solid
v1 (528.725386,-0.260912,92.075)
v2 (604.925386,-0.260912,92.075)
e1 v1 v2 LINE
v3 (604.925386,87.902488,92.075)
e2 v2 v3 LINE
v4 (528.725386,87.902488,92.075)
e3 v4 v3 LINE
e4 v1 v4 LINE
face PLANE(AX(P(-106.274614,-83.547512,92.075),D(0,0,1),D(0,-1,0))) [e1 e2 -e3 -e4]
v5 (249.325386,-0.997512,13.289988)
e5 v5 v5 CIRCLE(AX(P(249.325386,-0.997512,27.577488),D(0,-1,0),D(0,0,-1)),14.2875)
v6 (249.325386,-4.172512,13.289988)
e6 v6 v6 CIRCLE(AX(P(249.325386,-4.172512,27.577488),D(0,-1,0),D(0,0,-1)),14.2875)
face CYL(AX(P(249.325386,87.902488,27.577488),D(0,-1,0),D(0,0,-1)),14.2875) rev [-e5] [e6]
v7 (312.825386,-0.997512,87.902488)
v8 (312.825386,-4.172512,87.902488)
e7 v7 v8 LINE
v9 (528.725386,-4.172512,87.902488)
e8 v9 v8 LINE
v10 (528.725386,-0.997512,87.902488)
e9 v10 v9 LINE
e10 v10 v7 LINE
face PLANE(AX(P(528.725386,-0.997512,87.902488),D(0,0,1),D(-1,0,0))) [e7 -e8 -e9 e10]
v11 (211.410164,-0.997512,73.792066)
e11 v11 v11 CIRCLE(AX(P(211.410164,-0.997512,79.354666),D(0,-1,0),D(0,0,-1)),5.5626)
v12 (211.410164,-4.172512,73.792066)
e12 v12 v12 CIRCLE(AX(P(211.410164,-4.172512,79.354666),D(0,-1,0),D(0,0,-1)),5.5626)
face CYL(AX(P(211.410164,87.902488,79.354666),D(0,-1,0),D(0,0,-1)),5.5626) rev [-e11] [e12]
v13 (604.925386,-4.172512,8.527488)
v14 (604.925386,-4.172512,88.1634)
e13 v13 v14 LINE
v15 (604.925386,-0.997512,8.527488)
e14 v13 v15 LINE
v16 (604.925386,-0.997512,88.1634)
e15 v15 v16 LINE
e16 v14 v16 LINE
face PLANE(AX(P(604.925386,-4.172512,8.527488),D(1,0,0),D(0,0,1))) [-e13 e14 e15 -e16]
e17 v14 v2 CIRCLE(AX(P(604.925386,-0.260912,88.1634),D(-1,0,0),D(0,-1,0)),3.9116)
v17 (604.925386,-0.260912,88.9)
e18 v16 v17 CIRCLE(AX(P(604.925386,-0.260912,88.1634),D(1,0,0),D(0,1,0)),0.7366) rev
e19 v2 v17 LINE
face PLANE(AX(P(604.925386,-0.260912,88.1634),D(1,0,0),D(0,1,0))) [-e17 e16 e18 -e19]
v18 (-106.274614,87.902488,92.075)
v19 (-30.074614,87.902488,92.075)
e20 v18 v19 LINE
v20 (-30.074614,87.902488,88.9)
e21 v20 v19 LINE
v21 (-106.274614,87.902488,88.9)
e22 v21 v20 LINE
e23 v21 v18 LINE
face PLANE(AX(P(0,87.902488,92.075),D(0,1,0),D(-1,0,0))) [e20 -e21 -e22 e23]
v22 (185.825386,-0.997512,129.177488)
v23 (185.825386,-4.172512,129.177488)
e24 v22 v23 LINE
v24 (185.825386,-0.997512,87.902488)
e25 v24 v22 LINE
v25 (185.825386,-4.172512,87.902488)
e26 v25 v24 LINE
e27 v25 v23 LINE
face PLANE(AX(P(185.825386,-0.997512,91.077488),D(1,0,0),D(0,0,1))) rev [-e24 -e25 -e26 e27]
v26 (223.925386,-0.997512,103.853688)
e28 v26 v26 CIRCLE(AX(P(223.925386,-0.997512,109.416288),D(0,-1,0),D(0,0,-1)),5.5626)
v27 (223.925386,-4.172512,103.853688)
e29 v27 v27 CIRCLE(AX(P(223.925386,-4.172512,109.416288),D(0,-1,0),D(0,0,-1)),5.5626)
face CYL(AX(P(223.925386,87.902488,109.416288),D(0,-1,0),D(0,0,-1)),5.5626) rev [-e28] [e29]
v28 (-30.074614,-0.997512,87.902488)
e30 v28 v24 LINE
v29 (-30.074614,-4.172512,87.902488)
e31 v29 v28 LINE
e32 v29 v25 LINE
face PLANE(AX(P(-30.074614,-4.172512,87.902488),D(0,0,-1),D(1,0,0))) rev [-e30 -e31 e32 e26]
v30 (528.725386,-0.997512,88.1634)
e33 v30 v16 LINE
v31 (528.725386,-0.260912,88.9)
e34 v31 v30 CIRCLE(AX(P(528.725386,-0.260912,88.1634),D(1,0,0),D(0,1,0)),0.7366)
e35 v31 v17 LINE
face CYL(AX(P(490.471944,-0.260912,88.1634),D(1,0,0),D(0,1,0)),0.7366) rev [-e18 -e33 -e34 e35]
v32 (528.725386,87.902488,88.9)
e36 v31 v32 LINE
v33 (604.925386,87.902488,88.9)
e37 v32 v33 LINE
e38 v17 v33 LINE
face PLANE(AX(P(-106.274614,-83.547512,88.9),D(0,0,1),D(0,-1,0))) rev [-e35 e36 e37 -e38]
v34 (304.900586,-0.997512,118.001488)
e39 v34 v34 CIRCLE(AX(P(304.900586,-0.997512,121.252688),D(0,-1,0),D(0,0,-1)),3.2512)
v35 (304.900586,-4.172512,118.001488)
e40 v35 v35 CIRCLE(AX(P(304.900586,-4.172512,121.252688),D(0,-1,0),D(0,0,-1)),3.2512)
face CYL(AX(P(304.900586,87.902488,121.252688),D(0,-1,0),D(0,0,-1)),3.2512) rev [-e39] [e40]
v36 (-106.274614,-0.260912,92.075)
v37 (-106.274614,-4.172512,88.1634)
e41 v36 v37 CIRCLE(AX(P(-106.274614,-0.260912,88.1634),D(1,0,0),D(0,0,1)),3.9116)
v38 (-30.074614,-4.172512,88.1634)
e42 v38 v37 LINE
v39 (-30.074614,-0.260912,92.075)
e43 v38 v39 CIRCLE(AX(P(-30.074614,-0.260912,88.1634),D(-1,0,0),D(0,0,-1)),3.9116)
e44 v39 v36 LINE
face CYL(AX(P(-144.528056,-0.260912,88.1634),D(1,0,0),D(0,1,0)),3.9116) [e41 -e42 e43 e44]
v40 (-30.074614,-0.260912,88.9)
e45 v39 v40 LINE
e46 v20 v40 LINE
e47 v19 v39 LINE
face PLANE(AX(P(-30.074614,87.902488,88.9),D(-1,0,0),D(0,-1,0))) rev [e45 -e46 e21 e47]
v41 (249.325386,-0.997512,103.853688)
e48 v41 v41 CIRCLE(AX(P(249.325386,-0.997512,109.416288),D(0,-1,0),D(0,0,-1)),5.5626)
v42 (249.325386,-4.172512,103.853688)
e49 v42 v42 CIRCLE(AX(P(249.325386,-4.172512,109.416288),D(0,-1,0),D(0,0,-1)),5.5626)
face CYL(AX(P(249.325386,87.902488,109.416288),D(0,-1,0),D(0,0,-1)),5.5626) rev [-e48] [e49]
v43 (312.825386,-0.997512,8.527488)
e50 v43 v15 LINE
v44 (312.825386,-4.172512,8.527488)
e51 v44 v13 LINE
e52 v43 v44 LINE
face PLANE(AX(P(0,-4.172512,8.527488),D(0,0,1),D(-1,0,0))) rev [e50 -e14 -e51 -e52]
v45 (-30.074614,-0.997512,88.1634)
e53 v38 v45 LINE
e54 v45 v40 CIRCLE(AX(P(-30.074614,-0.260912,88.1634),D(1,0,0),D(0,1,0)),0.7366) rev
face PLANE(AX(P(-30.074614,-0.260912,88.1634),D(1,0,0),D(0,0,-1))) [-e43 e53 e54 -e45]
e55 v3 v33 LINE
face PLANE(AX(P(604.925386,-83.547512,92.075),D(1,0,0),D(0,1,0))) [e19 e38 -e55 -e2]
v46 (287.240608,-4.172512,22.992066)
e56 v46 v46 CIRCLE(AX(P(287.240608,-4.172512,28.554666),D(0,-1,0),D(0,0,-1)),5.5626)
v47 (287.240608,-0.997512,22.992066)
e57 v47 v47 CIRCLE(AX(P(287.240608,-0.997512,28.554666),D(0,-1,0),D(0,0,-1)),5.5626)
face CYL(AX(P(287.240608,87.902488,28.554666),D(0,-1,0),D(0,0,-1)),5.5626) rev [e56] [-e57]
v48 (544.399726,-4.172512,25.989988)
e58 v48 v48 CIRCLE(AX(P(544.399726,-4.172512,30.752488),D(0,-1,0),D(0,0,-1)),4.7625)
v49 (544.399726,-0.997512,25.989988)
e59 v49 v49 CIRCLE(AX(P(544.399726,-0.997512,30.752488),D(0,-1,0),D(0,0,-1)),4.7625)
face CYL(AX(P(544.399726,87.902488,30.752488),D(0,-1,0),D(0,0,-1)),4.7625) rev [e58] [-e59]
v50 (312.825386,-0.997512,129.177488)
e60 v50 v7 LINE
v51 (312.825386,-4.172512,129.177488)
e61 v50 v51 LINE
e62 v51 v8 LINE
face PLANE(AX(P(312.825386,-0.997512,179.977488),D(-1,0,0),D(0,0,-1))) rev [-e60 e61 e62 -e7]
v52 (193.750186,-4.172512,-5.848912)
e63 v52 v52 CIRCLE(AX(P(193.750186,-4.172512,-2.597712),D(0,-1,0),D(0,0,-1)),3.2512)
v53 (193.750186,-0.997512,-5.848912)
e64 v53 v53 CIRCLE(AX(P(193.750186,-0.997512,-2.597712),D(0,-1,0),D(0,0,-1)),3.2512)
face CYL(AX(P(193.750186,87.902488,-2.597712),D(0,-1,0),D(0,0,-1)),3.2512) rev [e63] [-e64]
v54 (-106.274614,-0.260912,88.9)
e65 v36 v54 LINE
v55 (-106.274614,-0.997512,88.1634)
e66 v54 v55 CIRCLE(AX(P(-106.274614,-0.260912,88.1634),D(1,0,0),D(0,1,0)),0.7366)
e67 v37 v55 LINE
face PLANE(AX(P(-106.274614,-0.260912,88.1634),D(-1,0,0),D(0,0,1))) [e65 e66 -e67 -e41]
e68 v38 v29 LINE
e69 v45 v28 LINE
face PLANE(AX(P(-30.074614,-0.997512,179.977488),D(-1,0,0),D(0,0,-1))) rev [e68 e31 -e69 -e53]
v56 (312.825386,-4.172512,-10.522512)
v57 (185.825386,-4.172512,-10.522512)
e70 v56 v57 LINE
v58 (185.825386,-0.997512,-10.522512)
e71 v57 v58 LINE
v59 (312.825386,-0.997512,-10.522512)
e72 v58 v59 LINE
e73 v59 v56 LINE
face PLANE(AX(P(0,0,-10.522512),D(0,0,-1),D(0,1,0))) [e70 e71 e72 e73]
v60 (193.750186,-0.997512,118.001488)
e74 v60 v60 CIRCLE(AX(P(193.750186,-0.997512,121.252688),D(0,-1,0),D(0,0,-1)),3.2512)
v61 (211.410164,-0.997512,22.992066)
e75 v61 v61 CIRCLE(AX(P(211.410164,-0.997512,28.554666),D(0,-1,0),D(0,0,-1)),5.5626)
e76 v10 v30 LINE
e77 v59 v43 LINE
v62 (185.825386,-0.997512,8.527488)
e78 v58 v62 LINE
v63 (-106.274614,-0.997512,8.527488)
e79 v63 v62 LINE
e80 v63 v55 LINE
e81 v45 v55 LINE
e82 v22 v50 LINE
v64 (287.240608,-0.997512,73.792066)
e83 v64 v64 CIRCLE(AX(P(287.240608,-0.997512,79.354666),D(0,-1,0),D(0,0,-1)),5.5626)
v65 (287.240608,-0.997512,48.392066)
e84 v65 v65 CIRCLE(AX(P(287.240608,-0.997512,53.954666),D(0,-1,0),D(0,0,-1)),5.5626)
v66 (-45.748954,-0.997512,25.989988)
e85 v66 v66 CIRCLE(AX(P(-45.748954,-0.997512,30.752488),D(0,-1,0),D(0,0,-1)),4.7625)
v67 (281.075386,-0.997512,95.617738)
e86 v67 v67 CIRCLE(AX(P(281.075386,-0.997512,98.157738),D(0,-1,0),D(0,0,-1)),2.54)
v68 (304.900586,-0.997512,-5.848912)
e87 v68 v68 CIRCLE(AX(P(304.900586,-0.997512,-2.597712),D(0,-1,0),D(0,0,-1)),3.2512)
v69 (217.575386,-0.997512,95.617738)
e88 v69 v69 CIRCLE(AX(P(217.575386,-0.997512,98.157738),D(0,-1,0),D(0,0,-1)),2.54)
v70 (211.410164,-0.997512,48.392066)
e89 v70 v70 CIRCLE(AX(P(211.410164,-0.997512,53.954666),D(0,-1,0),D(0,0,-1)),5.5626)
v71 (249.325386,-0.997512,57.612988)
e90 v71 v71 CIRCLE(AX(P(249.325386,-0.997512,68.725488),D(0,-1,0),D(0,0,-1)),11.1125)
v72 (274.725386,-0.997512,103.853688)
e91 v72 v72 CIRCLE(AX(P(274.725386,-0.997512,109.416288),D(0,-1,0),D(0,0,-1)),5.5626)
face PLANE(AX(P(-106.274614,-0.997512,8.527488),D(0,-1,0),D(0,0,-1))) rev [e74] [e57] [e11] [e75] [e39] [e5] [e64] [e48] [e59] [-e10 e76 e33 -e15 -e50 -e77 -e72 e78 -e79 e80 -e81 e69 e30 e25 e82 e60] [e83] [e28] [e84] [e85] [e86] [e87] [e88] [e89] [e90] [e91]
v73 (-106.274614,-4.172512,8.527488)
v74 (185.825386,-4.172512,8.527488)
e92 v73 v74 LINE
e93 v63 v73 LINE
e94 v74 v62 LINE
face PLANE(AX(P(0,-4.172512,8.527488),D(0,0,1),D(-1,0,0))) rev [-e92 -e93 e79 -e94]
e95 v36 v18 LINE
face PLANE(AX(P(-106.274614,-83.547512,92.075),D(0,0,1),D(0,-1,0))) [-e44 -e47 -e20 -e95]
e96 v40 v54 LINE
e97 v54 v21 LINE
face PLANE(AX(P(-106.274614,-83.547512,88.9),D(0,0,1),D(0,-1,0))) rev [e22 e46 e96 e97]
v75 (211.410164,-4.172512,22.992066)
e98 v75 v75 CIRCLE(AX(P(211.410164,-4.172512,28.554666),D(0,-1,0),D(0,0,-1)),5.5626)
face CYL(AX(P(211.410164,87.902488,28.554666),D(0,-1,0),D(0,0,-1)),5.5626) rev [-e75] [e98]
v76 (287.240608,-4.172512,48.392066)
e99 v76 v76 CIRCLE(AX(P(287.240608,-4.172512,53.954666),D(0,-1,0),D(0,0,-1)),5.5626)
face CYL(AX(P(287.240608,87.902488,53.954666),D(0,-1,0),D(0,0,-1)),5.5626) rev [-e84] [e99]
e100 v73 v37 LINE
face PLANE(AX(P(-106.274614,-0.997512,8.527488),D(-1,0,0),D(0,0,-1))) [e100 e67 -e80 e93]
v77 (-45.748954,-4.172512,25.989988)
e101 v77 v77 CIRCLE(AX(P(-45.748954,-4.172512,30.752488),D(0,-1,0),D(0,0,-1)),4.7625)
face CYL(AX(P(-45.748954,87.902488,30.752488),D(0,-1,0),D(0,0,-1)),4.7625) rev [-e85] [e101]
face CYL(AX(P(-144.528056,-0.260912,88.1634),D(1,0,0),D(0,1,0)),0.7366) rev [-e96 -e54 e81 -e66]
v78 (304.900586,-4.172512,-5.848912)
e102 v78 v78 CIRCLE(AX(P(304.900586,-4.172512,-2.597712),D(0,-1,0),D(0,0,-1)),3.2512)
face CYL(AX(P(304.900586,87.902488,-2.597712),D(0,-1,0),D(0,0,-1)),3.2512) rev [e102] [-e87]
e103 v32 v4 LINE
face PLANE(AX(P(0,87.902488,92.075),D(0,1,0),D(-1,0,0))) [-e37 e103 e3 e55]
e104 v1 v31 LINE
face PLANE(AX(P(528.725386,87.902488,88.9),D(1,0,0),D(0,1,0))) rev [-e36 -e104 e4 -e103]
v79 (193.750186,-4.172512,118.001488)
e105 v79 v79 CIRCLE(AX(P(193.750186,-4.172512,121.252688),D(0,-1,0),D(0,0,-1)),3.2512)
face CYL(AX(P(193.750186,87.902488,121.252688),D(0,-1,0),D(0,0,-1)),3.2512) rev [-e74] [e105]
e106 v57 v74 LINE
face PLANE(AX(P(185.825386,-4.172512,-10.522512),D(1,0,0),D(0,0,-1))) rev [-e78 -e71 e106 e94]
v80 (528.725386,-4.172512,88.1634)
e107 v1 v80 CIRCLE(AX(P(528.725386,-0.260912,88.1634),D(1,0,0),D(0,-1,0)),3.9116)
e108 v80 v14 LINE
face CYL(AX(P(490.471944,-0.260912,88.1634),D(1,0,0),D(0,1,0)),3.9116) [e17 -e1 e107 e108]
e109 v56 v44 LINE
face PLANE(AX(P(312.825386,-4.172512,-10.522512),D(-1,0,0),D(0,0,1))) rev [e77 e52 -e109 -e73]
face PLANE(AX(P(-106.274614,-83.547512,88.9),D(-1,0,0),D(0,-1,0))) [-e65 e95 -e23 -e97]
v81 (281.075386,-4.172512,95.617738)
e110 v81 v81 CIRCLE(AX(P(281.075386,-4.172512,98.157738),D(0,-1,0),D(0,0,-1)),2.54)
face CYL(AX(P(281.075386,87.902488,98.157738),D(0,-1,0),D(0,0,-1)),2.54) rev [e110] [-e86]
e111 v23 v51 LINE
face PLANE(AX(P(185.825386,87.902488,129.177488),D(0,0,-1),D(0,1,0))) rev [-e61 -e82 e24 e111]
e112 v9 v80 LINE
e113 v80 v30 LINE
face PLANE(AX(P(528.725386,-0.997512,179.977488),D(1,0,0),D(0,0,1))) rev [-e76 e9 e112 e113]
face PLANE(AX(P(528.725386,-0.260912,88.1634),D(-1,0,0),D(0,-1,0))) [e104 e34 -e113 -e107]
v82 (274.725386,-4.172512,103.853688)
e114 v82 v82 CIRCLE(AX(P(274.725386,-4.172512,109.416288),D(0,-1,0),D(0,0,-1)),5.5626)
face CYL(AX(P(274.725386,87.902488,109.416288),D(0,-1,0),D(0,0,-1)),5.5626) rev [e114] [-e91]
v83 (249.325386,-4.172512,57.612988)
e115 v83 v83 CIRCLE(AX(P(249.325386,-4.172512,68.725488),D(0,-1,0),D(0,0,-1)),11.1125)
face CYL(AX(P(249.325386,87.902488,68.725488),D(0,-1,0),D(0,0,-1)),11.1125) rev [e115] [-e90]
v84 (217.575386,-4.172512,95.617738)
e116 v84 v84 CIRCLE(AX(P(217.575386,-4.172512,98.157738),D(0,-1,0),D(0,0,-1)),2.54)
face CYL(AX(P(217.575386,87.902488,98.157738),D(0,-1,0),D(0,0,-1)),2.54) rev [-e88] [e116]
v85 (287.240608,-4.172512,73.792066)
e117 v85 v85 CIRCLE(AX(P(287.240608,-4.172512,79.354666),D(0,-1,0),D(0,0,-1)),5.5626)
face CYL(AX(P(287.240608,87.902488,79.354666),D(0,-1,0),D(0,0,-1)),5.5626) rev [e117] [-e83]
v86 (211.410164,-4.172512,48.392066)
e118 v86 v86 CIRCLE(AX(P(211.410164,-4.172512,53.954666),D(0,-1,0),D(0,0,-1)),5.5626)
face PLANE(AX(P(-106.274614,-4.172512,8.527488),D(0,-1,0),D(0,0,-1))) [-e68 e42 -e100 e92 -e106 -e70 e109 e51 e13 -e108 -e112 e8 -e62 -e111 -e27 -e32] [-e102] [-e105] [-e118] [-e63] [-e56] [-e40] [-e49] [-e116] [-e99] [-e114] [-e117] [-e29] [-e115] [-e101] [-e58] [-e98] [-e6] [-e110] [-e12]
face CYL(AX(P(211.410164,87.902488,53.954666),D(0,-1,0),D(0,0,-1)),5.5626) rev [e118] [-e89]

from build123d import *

# Parameters (mm, degrees)
SKETCH18_W                    = 711.2
SKETCH18_H                    = 3.175
BASE_FLANGE1_DEPTH            = 171.45
SKETCH23_W                    = 215.9
SKETCH23_H                    = 88.9
CUT_EXTRUDE1_DEPTH            = 629.760610691
SKETCH24_W                    = 127
SKETCH24_H                    = 31.75
CUT_EXTRUDE2_DEPTH            = 629.760610691
SKETCH25_W                    = 215.9
SKETCH25_H                    = 88.9
CUT_EXTRUDE3_DEPTH            = 629.760610691
SKETCH30_W                    = 215.9
SKETCH30_H                    = 3.175
CUT_EXTRUDE6_DEPTH            = 629.760610691
SKETCH38_W                    = 215.9
SKETCH38_H                    = 3.175
CUT_EXTRUDE8_DEPTH            = 629.760610691
SKETCHED_START                = -106.274614162
SKETCHED_BEND17_OUTLINE_W     = 3.175
SKETCHED_BEND17_OUTLINE_H     = 88.9
SKETCHED_BEND17_OUTLINE_H_2   = 79.375
SKETCHED_BEND17_DEPTH         = 635
SKETCHED_START_2              = 528.725385838
SKETCHED_BEND17_2_DEPTH       = 76.2
SKETCHED_BEND17_3_OUTLINE_W   = 79.375
SKETCHED_BEND17_3_OUTLINE_H   = 3.175
SKETCHED_BEND17_3_DEPTH       = 711.2
SKETCHED_START_3              = 185.825385838
SKETCHED_BEND17_4_OUTLINE_W   = 56.152487743
SKETCHED_BEND17_4_OUTLINE_H   = 3.175
SKETCHED_BEND17_4_OUTLINE_W_2 = 0.997512257
SKETCHED_BEND17_4_DEPTH       = 127
SKETCHED_BEND17_5_OUTLINE_W   = 87.902487743
SKETCHED_BEND17_5_OUTLINE_H   = 3.175
SKETCHED_BEND17_5_OUTLINE_W_2 = 0.997512257
SKETCHED_BEND17_5_DEPTH       = 76.2
SKETCHED_BEND17_6_DEPTH       = 76.2
SKETCHED_BEND18_OUTLINE_W     = 79.375
SKETCHED_BEND18_OUTLINE_H     = 3.175
SKETCHED_BEND18_DEPTH         = 711.2
SKETCHED_BEND18_2_DEPTH       = 127
SKETCHED_BEND18_3_DEPTH       = 76.2
SKETCHED_BEND18_4_DEPTH       = 76.2
SKETCHED_BEND18_5_OUTLINE_W   = 3.175
SKETCHED_BEND18_5_OUTLINE_H   = 79.375
SKETCHED_BEND18_5_DEPTH       = 711.2
SKETCHED_BEND18_6_OUTLINE_W   = 3.175
SKETCHED_BEND18_6_OUTLINE_H   = 56.152487743
SKETCHED_BEND18_6_OUTLINE_H_2 = 0.997512257
SKETCHED_BEND18_6_DEPTH       = 127
SKETCHED_BEND18_7_DEPTH       = 76.2
SKETCHED_BEND18_8_DEPTH       = 76.2
SKETCH46_R                    = 3.2512
SKETCH46_R_2                  = 5.5626
SKETCH46_R_3                  = 2.54
SKETCH46_R_4                  = 11.1125
SKETCH46_R_5                  = 14.2875
CUT_EXTRUDE10_DEPTH           = 630.590276433
SKETCH47_R                    = 4.7625
CUT_EXTRUDE11_DEPTH           = 630.590276433
SKETCH48_W                    = 127
SKETCH48_H                    = 3.175
BOSS_EXTRUDE1_DEPTH           = 19.05
SKETCH49_R                    = 3.2512
CUT_EXTRUDE12_DEPTH           = 630.590276433
SKETCH50_W                    = 127
SKETCH50_H                    = 19.05
CUT_EXTRUDE13_DEPTH           = 630.590276433


# Read off the part's stored shape, not the designer's step: Sketched Bend17, Sketched Bend18
# Sheet-metal steps are written as plain solids
with BuildPart() as part:
    # Sketch18 → Base-Flange1 (new body)
    with BuildSketch(Plane.XY):
        with Locations((249.325385838, -1.5875)):
            Rectangle(SKETCH18_W, SKETCH18_H)
    extrude(amount=BASE_FLANGE1_DEPTH)

    # Sketch23 → Cut-Extrude1 (cut, through all)
    with BuildSketch(Plane(origin=(0, 0, 0), x_dir=(1, 0, 0), z_dir=(0, 1, 0))):
        with Locations((77.875385838, -44.45)):
            Rectangle(SKETCH23_W, SKETCH23_H)
    extrude(amount=-CUT_EXTRUDE1_DEPTH, mode=Mode.SUBTRACT)

    # Sketch24 → Cut-Extrude2 (cut, through all)
    with BuildSketch(Plane(origin=(0, 0, 0), x_dir=(1, 0, 0), z_dir=(0, 1, 0))):
        with Locations((249.325385838, -15.875)):
            Rectangle(SKETCH24_W, SKETCH24_H)
    extrude(amount=-CUT_EXTRUDE2_DEPTH, mode=Mode.SUBTRACT)

    # Sketch25 → Cut-Extrude3 (cut, through all)
    with BuildSketch(Plane(origin=(0, 0, 0), x_dir=(1, 0, 0), z_dir=(0, 1, 0))):
        with Locations((420.775385838, -44.45)):
            Rectangle(SKETCH25_W, SKETCH25_H)
    extrude(amount=-CUT_EXTRUDE3_DEPTH, mode=Mode.SUBTRACT)

    # Sketch30 → Cut-Extrude6 (cut, through all)
    with BuildSketch(Plane(origin=(0, 0, 0), x_dir=(1, 0, 0), z_dir=(0, 1, 0))):
        with Locations((77.875385838, -90.4875)):
            Rectangle(SKETCH30_W, SKETCH30_H)
    extrude(amount=-CUT_EXTRUDE6_DEPTH, mode=Mode.SUBTRACT)

    # Sketch38 → Cut-Extrude8 (cut, through all)
    with BuildSketch(Plane(origin=(0, -3.175, 0), x_dir=(-1, 0, 0), z_dir=(0, -1, 0))):
        with Locations((-420.775385838, -90.4875)):
            Rectangle(SKETCH38_W, SKETCH38_H)
    extrude(amount=-CUT_EXTRUDE8_DEPTH, mode=Mode.SUBTRACT)

    # Sketched Bend17 outline → Sketched Bend17 (cut)
    with BuildSketch(Plane.YZ.offset(SKETCHED_START)):
        with Locations((-1.5875, 44.45)):
            Rectangle(SKETCHED_BEND17_OUTLINE_W, SKETCHED_BEND17_OUTLINE_H)
        with Locations((-1.5875, 131.7625)):
            Rectangle(SKETCHED_BEND17_OUTLINE_W, SKETCHED_BEND17_OUTLINE_H_2)
    extrude(amount=SKETCHED_BEND17_DEPTH, mode=Mode.SUBTRACT)

    # Sketched Bend17 2 outline → Sketched Bend17 2 (cut)
    with BuildSketch(Plane.YZ.offset(SKETCHED_START_2)):
        with BuildLine():
            Line((0, 88.1634), (0, 171.45))
            Line((0, 171.45), (-3.175, 171.45))
            Line((-3.175, 171.45), (-3.175, 92.005018799))
            ThreePointArc((-3.175, 92.005018799), (-0.896479843, 90.655319942), (0, 88.1634))
        make_face()
    extrude(amount=SKETCHED_BEND17_2_DEPTH, mode=Mode.SUBTRACT)



with BuildPart() as body_2:
    # Sketched Bend17 3 outline → Sketched Bend17 3 (new body)
    with BuildSketch(Plane.YZ.offset(SKETCHED_START)):
        with Locations((-43.860012257, 90.4875)):
            Rectangle(SKETCHED_BEND17_3_OUTLINE_W, SKETCHED_BEND17_3_OUTLINE_H)
    extrude(amount=SKETCHED_BEND17_3_DEPTH)


with BuildPart() as part_1:
    add(part.part)

    add(body_2.part)  # Sketched Bend17 4 merges body 2
    # Sketched Bend17 4 outline → Sketched Bend17 4 (add)
    with BuildSketch(Plane.YZ.offset(SKETCHED_START_3)):
        with Locations((28.076243872, 90.4875)):
            Rectangle(SKETCHED_BEND17_4_OUTLINE_W, SKETCHED_BEND17_4_OUTLINE_H)
        with Locations((-3.673756128, 90.4875)):
            Rectangle(SKETCHED_BEND17_4_OUTLINE_W_2, SKETCHED_BEND17_4_OUTLINE_H)
    extrude(amount=SKETCHED_BEND17_4_DEPTH)

    # Sketched Bend17 5 outline → Sketched Bend17 5 (add)
    with BuildSketch(Plane.YZ.offset(SKETCHED_START)):
        with Locations((43.951243872, 90.4875)):
            Rectangle(SKETCHED_BEND17_5_OUTLINE_W, SKETCHED_BEND17_5_OUTLINE_H)
        with Locations((-3.673756128, 90.4875)):
            Rectangle(SKETCHED_BEND17_5_OUTLINE_W_2, SKETCHED_BEND17_5_OUTLINE_H)
    extrude(amount=SKETCHED_BEND17_5_DEPTH)

    # Sketched Bend17 6 outline → Sketched Bend17 6 (add)
    with BuildSketch(Plane.YZ.offset(SKETCHED_START_2)):
        with BuildLine():
            Line((-3.175, 88.1634), (-3.175, 92.005018799))
            ThreePointArc((-3.175, 92.005018799), (-3.541641581, 92.057465398), (-3.9116, 92.075))
            Line((-3.9116, 92.075), (-4.172512257, 92.075))
            Line((-4.172512257, 92.075), (-4.172512257, 88.9))
            Line((-4.172512257, 88.9), (-3.9116, 88.9))
            ThreePointArc((-3.9116, 88.9), (-3.390745145, 88.684254855), (-3.175, 88.1634))
        make_face()
    extrude(amount=SKETCHED_BEND17_6_DEPTH)

    # Sketched Bend18 outline → Sketched Bend18 (cut)
    with BuildSketch(Plane.YZ.offset(SKETCHED_START)):
        with Locations((-43.860012257, 90.4875)):
            Rectangle(SKETCHED_BEND18_OUTLINE_W, SKETCHED_BEND18_OUTLINE_H)
        with BuildLine():
            Line((-0.260912257, 92.075), (-0.997512257, 92.075))
            Line((-0.997512257, 92.075), (-0.997512257, 92.005018799))
            ThreePointArc((-0.997512257, 92.005018799), (-0.630870676, 92.057465398), (-0.260912257, 92.075))
        make_face()
        with BuildLine():
            ThreePointArc((0, 88.1634), (-0.017534602, 88.533358419), (-0.069981201, 88.9))
            Line((-0.069981201, 88.9), (-0.260912257, 88.9))
            ThreePointArc((-0.260912257, 88.9), (-0.781767112, 88.684254855), (-0.997512257, 88.1634))
            Line((-0.997512257, 88.1634), (-0.997512257, 8.527487743))
            Line((-0.997512257, 8.527487743), (-3.175, 8.527487743))
            Line((-3.175, 8.527487743), (-3.175, 0))
            Line((-3.175, 0), (0, 0))
            Line((0, 0), (0, 88.1634))
        make_face()
    extrude(amount=SKETCHED_BEND18_DEPTH, mode=Mode.SUBTRACT)

    # Sketched Bend18 2 outline → Sketched Bend18 2 (cut)
    with BuildSketch(Plane.YZ.offset(SKETCHED_START_3)):
        with BuildLine():
            ThreePointArc((-0.260912257, 92.075), (-0.630870676, 92.057465398), (-0.997512257, 92.005018799))
            Line((-0.997512257, 92.005018799), (-0.997512257, 88.9))
            Line((-0.997512257, 88.9), (56.152487743, 88.9))
            Line((56.152487743, 88.9), (56.152487743, 92.075))
            Line((56.152487743, 92.075), (-0.260912257, 92.075))
        make_face()
    extrude(amount=SKETCHED_BEND18_2_DEPTH, mode=Mode.SUBTRACT)

    # Sketched Bend18 3 outline → Sketched Bend18 3 (cut)
    with BuildSketch(Plane.YZ.offset(SKETCHED_START)):
        with BuildLine():
            Line((-4.172512257, 92.075), (-4.172512257, 88.9))
            Line((-4.172512257, 88.9), (-4.102531056, 88.9))
            ThreePointArc((-4.102531056, 88.9), (-3.026831142, 90.929318885), (-0.997512257, 92.005018799))
            Line((-0.997512257, 92.005018799), (-0.997512257, 92.075))
            Line((-0.997512257, 92.075), (-4.172512257, 92.075))
        make_face()
    extrude(amount=SKETCHED_BEND18_3_DEPTH, mode=Mode.SUBTRACT)

    # Sketched Bend18 4 outline → Sketched Bend18 4 (cut)
    with BuildSketch(Plane.YZ.offset(SKETCHED_START_2)):
        with BuildLine():
            Line((-3.9116, 92.075), (-4.172512257, 92.075))
            Line((-4.172512257, 92.075), (-4.172512257, 88.9))
            Line((-4.172512257, 88.9), (-4.102531056, 88.9))
            ThreePointArc((-4.102531056, 88.9), (-3.404521564, 90.491131747), (-2.086256128, 91.622985858))
            ThreePointArc((-2.086256128, 91.622985858), (-2.971361063, 91.960315235), (-3.9116, 92.075))
        make_face()
    extrude(amount=SKETCHED_BEND18_4_DEPTH, mode=Mode.SUBTRACT)

    # Sketched Bend18 5 outline → Sketched Bend18 5 (add)
    with BuildSketch(Plane.YZ.offset(SKETCHED_START)):
        with Locations((-2.585012257, 48.214987743)):
            Rectangle(SKETCHED_BEND18_5_OUTLINE_W, SKETCHED_BEND18_5_OUTLINE_H)
    extrude(amount=SKETCHED_BEND18_5_DEPTH)

    # Sketched Bend18 6 outline → Sketched Bend18 6 (add)
    with BuildSketch(Plane.YZ.offset(SKETCHED_START_3)):
        with Locations((-2.585012257, 120.151243872)):
            Rectangle(SKETCHED_BEND18_6_OUTLINE_W, SKETCHED_BEND18_6_OUTLINE_H)
        with Locations((-2.585012257, 88.401243872)):
            Rectangle(SKETCHED_BEND18_6_OUTLINE_W, SKETCHED_BEND18_6_OUTLINE_H_2)
    extrude(amount=SKETCHED_BEND18_6_DEPTH)

    # Sketched Bend18 7 outline → Sketched Bend18 7 (add)
    with BuildSketch(Plane.YZ.offset(SKETCHED_START_2)):
        with BuildLine():
            ThreePointArc((-4.102531056, 88.9), (-4.154977655, 88.533358419), (-4.172512257, 88.1634))
            Line((-4.172512257, 88.1634), (-4.172512257, 87.902487743))
            Line((-4.172512257, 87.902487743), (-3.175, 87.902487743))
            Line((-3.175, 87.902487743), (-3.175, 88.1634))
            ThreePointArc((-3.175, 88.1634), (-3.390745145, 88.684254855), (-3.9116, 88.9))
            Line((-3.9116, 88.9), (-4.102531056, 88.9))
        make_face()
        with BuildLine():
            ThreePointArc((-2.086256128, 91.622985858), (-0.767990693, 90.491131747), (-0.069981201, 88.9))
            Line((-0.069981201, 88.9), (87.902487743, 88.9))
            Line((87.902487743, 88.9), (87.902487743, 92.075))
            Line((87.902487743, 92.075), (-0.260912257, 92.075))
            ThreePointArc((-0.260912257, 92.075), (-1.201151194, 91.960315235), (-2.086256128, 91.622985858))
        make_face()
    extrude(amount=SKETCHED_BEND18_7_DEPTH)

    # Sketched Bend18 8 outline → Sketched Bend18 8 (add)
    with BuildSketch(Plane.YZ.offset(SKETCHED_START)):
        with BuildLine():
            ThreePointArc((-4.102531056, 88.9), (-4.154977655, 88.533358419), (-4.172512257, 88.1634))
            Line((-4.172512257, 88.1634), (-4.172512257, 87.902487743))
            Line((-4.172512257, 87.902487743), (-0.997512257, 87.902487743))
            Line((-0.997512257, 87.902487743), (-0.997512257, 88.1634))
            ThreePointArc((-0.997512257, 88.1634), (-0.781767112, 88.684254855), (-0.260912257, 88.9))
            Line((-0.260912257, 88.9), (-4.102531056, 88.9))
        make_face()
    extrude(amount=SKETCHED_BEND18_8_DEPTH)

    # Sketch46 → Cut-Extrude10 (cut, through all)
    with BuildSketch(Plane.XZ.offset(4.172512257)):
        with Locations(Location((193.750185838, 121.252687743, 0), (0, 0, 270))):
            Circle(SKETCH46_R)
        with Locations(Location((223.925385838, 109.416287743, 0), (0, 0, 270))):
            Circle(SKETCH46_R_2)
        with Locations(Location((217.575385838, 98.157737743, 0), (0, 0, 270))):
            Circle(SKETCH46_R_3)
        with Locations(Location((249.325385838, 109.416287743, 0), (0, 0, 270))):
            Circle(SKETCH46_R_2)
        with Locations(Location((274.725385838, 109.416287743, 0), (0, 0, 270))):
            Circle(SKETCH46_R_2)
        with Locations(Location((304.900585838, 121.252687743, 0), (0, 0, 270))):
            Circle(SKETCH46_R)
        with Locations(Location((281.075385838, 98.157737743, 0), (0, 0, 270))):
            Circle(SKETCH46_R_3)
        with Locations(Location((211.4101641, 79.354666332, 0), (0, 0, 270))):
            Circle(SKETCH46_R_2)
        with Locations(Location((249.325385838, 68.725487743, 0), (0, 0, 270))):
            Circle(SKETCH46_R_4)
        with Locations(Location((287.240607577, 79.354666332, 0), (0, 0, 270))):
            Circle(SKETCH46_R_2)
        with Locations(Location((211.4101641, 53.954666332, 0), (0, 0, 270))):
            Circle(SKETCH46_R_2)
        with Locations(Location((287.240607577, 53.954666332, 0), (0, 0, 270))):
            Circle(SKETCH46_R_2)
        with Locations(Location((211.4101641, 28.554666332, 0), (0, 0, 270))):
            Circle(SKETCH46_R_2)
        with Locations(Location((249.325385838, 27.577487743, 0), (0, 0, 270))):
            Circle(SKETCH46_R_5)
        with Locations(Location((287.240607577, 28.554666332, 0), (0, 0, 270))):
            Circle(SKETCH46_R_2)
    extrude(amount=-CUT_EXTRUDE10_DEPTH, mode=Mode.SUBTRACT)

    # Sketch47 → Cut-Extrude11 (cut, through all)
    with BuildSketch(Plane.XZ.offset(4.172512257)):
        with Locations(Location((-45.748954162, 30.752487743, 0), (0, 0, 270))):
            Circle(SKETCH47_R)
        with Locations(Location((544.399725838, 30.752487743, 0), (0, 0, 270))):
            Circle(SKETCH47_R)
    extrude(amount=-CUT_EXTRUDE11_DEPTH, mode=Mode.SUBTRACT)

    # Sketch48 → Boss-Extrude1 (add)
    with BuildSketch(Plane(origin=(0, 0, 8.527487743), x_dir=(-1, 0, 0), z_dir=(0, 0, -1))):
        with Locations((-249.325385838, -2.585012257)):
            Rectangle(SKETCH48_W, SKETCH48_H)
    extrude(amount=BOSS_EXTRUDE1_DEPTH)

    # Sketch49 → Cut-Extrude12 (cut, through all)
    with BuildSketch(Plane(origin=(0, -4.172512257, 0), x_dir=(-1, 0, 0), z_dir=(0, -1, 0))):
        with Locations(Location((-193.750185838, 2.597712257, 0), (0, 0, 90))):
            Circle(SKETCH49_R)
        with Locations(Location((-304.900585838, 2.597712257, 0), (0, 0, 90))):
            Circle(SKETCH49_R)
    extrude(amount=-CUT_EXTRUDE12_DEPTH, mode=Mode.SUBTRACT)

    # Sketch50 → Cut-Extrude13 (cut, through all)
    with BuildSketch(Plane(origin=(0, -4.172512257, 0), x_dir=(-1, 0, 0), z_dir=(0, -1, 0))):
        with Locations((-249.325385838, -138.702487743)):
            Rectangle(SKETCH50_W, SKETCH50_H)
    extrude(amount=-CUT_EXTRUDE13_DEPTH, mode=Mode.SUBTRACT)


solid = part_1.part
